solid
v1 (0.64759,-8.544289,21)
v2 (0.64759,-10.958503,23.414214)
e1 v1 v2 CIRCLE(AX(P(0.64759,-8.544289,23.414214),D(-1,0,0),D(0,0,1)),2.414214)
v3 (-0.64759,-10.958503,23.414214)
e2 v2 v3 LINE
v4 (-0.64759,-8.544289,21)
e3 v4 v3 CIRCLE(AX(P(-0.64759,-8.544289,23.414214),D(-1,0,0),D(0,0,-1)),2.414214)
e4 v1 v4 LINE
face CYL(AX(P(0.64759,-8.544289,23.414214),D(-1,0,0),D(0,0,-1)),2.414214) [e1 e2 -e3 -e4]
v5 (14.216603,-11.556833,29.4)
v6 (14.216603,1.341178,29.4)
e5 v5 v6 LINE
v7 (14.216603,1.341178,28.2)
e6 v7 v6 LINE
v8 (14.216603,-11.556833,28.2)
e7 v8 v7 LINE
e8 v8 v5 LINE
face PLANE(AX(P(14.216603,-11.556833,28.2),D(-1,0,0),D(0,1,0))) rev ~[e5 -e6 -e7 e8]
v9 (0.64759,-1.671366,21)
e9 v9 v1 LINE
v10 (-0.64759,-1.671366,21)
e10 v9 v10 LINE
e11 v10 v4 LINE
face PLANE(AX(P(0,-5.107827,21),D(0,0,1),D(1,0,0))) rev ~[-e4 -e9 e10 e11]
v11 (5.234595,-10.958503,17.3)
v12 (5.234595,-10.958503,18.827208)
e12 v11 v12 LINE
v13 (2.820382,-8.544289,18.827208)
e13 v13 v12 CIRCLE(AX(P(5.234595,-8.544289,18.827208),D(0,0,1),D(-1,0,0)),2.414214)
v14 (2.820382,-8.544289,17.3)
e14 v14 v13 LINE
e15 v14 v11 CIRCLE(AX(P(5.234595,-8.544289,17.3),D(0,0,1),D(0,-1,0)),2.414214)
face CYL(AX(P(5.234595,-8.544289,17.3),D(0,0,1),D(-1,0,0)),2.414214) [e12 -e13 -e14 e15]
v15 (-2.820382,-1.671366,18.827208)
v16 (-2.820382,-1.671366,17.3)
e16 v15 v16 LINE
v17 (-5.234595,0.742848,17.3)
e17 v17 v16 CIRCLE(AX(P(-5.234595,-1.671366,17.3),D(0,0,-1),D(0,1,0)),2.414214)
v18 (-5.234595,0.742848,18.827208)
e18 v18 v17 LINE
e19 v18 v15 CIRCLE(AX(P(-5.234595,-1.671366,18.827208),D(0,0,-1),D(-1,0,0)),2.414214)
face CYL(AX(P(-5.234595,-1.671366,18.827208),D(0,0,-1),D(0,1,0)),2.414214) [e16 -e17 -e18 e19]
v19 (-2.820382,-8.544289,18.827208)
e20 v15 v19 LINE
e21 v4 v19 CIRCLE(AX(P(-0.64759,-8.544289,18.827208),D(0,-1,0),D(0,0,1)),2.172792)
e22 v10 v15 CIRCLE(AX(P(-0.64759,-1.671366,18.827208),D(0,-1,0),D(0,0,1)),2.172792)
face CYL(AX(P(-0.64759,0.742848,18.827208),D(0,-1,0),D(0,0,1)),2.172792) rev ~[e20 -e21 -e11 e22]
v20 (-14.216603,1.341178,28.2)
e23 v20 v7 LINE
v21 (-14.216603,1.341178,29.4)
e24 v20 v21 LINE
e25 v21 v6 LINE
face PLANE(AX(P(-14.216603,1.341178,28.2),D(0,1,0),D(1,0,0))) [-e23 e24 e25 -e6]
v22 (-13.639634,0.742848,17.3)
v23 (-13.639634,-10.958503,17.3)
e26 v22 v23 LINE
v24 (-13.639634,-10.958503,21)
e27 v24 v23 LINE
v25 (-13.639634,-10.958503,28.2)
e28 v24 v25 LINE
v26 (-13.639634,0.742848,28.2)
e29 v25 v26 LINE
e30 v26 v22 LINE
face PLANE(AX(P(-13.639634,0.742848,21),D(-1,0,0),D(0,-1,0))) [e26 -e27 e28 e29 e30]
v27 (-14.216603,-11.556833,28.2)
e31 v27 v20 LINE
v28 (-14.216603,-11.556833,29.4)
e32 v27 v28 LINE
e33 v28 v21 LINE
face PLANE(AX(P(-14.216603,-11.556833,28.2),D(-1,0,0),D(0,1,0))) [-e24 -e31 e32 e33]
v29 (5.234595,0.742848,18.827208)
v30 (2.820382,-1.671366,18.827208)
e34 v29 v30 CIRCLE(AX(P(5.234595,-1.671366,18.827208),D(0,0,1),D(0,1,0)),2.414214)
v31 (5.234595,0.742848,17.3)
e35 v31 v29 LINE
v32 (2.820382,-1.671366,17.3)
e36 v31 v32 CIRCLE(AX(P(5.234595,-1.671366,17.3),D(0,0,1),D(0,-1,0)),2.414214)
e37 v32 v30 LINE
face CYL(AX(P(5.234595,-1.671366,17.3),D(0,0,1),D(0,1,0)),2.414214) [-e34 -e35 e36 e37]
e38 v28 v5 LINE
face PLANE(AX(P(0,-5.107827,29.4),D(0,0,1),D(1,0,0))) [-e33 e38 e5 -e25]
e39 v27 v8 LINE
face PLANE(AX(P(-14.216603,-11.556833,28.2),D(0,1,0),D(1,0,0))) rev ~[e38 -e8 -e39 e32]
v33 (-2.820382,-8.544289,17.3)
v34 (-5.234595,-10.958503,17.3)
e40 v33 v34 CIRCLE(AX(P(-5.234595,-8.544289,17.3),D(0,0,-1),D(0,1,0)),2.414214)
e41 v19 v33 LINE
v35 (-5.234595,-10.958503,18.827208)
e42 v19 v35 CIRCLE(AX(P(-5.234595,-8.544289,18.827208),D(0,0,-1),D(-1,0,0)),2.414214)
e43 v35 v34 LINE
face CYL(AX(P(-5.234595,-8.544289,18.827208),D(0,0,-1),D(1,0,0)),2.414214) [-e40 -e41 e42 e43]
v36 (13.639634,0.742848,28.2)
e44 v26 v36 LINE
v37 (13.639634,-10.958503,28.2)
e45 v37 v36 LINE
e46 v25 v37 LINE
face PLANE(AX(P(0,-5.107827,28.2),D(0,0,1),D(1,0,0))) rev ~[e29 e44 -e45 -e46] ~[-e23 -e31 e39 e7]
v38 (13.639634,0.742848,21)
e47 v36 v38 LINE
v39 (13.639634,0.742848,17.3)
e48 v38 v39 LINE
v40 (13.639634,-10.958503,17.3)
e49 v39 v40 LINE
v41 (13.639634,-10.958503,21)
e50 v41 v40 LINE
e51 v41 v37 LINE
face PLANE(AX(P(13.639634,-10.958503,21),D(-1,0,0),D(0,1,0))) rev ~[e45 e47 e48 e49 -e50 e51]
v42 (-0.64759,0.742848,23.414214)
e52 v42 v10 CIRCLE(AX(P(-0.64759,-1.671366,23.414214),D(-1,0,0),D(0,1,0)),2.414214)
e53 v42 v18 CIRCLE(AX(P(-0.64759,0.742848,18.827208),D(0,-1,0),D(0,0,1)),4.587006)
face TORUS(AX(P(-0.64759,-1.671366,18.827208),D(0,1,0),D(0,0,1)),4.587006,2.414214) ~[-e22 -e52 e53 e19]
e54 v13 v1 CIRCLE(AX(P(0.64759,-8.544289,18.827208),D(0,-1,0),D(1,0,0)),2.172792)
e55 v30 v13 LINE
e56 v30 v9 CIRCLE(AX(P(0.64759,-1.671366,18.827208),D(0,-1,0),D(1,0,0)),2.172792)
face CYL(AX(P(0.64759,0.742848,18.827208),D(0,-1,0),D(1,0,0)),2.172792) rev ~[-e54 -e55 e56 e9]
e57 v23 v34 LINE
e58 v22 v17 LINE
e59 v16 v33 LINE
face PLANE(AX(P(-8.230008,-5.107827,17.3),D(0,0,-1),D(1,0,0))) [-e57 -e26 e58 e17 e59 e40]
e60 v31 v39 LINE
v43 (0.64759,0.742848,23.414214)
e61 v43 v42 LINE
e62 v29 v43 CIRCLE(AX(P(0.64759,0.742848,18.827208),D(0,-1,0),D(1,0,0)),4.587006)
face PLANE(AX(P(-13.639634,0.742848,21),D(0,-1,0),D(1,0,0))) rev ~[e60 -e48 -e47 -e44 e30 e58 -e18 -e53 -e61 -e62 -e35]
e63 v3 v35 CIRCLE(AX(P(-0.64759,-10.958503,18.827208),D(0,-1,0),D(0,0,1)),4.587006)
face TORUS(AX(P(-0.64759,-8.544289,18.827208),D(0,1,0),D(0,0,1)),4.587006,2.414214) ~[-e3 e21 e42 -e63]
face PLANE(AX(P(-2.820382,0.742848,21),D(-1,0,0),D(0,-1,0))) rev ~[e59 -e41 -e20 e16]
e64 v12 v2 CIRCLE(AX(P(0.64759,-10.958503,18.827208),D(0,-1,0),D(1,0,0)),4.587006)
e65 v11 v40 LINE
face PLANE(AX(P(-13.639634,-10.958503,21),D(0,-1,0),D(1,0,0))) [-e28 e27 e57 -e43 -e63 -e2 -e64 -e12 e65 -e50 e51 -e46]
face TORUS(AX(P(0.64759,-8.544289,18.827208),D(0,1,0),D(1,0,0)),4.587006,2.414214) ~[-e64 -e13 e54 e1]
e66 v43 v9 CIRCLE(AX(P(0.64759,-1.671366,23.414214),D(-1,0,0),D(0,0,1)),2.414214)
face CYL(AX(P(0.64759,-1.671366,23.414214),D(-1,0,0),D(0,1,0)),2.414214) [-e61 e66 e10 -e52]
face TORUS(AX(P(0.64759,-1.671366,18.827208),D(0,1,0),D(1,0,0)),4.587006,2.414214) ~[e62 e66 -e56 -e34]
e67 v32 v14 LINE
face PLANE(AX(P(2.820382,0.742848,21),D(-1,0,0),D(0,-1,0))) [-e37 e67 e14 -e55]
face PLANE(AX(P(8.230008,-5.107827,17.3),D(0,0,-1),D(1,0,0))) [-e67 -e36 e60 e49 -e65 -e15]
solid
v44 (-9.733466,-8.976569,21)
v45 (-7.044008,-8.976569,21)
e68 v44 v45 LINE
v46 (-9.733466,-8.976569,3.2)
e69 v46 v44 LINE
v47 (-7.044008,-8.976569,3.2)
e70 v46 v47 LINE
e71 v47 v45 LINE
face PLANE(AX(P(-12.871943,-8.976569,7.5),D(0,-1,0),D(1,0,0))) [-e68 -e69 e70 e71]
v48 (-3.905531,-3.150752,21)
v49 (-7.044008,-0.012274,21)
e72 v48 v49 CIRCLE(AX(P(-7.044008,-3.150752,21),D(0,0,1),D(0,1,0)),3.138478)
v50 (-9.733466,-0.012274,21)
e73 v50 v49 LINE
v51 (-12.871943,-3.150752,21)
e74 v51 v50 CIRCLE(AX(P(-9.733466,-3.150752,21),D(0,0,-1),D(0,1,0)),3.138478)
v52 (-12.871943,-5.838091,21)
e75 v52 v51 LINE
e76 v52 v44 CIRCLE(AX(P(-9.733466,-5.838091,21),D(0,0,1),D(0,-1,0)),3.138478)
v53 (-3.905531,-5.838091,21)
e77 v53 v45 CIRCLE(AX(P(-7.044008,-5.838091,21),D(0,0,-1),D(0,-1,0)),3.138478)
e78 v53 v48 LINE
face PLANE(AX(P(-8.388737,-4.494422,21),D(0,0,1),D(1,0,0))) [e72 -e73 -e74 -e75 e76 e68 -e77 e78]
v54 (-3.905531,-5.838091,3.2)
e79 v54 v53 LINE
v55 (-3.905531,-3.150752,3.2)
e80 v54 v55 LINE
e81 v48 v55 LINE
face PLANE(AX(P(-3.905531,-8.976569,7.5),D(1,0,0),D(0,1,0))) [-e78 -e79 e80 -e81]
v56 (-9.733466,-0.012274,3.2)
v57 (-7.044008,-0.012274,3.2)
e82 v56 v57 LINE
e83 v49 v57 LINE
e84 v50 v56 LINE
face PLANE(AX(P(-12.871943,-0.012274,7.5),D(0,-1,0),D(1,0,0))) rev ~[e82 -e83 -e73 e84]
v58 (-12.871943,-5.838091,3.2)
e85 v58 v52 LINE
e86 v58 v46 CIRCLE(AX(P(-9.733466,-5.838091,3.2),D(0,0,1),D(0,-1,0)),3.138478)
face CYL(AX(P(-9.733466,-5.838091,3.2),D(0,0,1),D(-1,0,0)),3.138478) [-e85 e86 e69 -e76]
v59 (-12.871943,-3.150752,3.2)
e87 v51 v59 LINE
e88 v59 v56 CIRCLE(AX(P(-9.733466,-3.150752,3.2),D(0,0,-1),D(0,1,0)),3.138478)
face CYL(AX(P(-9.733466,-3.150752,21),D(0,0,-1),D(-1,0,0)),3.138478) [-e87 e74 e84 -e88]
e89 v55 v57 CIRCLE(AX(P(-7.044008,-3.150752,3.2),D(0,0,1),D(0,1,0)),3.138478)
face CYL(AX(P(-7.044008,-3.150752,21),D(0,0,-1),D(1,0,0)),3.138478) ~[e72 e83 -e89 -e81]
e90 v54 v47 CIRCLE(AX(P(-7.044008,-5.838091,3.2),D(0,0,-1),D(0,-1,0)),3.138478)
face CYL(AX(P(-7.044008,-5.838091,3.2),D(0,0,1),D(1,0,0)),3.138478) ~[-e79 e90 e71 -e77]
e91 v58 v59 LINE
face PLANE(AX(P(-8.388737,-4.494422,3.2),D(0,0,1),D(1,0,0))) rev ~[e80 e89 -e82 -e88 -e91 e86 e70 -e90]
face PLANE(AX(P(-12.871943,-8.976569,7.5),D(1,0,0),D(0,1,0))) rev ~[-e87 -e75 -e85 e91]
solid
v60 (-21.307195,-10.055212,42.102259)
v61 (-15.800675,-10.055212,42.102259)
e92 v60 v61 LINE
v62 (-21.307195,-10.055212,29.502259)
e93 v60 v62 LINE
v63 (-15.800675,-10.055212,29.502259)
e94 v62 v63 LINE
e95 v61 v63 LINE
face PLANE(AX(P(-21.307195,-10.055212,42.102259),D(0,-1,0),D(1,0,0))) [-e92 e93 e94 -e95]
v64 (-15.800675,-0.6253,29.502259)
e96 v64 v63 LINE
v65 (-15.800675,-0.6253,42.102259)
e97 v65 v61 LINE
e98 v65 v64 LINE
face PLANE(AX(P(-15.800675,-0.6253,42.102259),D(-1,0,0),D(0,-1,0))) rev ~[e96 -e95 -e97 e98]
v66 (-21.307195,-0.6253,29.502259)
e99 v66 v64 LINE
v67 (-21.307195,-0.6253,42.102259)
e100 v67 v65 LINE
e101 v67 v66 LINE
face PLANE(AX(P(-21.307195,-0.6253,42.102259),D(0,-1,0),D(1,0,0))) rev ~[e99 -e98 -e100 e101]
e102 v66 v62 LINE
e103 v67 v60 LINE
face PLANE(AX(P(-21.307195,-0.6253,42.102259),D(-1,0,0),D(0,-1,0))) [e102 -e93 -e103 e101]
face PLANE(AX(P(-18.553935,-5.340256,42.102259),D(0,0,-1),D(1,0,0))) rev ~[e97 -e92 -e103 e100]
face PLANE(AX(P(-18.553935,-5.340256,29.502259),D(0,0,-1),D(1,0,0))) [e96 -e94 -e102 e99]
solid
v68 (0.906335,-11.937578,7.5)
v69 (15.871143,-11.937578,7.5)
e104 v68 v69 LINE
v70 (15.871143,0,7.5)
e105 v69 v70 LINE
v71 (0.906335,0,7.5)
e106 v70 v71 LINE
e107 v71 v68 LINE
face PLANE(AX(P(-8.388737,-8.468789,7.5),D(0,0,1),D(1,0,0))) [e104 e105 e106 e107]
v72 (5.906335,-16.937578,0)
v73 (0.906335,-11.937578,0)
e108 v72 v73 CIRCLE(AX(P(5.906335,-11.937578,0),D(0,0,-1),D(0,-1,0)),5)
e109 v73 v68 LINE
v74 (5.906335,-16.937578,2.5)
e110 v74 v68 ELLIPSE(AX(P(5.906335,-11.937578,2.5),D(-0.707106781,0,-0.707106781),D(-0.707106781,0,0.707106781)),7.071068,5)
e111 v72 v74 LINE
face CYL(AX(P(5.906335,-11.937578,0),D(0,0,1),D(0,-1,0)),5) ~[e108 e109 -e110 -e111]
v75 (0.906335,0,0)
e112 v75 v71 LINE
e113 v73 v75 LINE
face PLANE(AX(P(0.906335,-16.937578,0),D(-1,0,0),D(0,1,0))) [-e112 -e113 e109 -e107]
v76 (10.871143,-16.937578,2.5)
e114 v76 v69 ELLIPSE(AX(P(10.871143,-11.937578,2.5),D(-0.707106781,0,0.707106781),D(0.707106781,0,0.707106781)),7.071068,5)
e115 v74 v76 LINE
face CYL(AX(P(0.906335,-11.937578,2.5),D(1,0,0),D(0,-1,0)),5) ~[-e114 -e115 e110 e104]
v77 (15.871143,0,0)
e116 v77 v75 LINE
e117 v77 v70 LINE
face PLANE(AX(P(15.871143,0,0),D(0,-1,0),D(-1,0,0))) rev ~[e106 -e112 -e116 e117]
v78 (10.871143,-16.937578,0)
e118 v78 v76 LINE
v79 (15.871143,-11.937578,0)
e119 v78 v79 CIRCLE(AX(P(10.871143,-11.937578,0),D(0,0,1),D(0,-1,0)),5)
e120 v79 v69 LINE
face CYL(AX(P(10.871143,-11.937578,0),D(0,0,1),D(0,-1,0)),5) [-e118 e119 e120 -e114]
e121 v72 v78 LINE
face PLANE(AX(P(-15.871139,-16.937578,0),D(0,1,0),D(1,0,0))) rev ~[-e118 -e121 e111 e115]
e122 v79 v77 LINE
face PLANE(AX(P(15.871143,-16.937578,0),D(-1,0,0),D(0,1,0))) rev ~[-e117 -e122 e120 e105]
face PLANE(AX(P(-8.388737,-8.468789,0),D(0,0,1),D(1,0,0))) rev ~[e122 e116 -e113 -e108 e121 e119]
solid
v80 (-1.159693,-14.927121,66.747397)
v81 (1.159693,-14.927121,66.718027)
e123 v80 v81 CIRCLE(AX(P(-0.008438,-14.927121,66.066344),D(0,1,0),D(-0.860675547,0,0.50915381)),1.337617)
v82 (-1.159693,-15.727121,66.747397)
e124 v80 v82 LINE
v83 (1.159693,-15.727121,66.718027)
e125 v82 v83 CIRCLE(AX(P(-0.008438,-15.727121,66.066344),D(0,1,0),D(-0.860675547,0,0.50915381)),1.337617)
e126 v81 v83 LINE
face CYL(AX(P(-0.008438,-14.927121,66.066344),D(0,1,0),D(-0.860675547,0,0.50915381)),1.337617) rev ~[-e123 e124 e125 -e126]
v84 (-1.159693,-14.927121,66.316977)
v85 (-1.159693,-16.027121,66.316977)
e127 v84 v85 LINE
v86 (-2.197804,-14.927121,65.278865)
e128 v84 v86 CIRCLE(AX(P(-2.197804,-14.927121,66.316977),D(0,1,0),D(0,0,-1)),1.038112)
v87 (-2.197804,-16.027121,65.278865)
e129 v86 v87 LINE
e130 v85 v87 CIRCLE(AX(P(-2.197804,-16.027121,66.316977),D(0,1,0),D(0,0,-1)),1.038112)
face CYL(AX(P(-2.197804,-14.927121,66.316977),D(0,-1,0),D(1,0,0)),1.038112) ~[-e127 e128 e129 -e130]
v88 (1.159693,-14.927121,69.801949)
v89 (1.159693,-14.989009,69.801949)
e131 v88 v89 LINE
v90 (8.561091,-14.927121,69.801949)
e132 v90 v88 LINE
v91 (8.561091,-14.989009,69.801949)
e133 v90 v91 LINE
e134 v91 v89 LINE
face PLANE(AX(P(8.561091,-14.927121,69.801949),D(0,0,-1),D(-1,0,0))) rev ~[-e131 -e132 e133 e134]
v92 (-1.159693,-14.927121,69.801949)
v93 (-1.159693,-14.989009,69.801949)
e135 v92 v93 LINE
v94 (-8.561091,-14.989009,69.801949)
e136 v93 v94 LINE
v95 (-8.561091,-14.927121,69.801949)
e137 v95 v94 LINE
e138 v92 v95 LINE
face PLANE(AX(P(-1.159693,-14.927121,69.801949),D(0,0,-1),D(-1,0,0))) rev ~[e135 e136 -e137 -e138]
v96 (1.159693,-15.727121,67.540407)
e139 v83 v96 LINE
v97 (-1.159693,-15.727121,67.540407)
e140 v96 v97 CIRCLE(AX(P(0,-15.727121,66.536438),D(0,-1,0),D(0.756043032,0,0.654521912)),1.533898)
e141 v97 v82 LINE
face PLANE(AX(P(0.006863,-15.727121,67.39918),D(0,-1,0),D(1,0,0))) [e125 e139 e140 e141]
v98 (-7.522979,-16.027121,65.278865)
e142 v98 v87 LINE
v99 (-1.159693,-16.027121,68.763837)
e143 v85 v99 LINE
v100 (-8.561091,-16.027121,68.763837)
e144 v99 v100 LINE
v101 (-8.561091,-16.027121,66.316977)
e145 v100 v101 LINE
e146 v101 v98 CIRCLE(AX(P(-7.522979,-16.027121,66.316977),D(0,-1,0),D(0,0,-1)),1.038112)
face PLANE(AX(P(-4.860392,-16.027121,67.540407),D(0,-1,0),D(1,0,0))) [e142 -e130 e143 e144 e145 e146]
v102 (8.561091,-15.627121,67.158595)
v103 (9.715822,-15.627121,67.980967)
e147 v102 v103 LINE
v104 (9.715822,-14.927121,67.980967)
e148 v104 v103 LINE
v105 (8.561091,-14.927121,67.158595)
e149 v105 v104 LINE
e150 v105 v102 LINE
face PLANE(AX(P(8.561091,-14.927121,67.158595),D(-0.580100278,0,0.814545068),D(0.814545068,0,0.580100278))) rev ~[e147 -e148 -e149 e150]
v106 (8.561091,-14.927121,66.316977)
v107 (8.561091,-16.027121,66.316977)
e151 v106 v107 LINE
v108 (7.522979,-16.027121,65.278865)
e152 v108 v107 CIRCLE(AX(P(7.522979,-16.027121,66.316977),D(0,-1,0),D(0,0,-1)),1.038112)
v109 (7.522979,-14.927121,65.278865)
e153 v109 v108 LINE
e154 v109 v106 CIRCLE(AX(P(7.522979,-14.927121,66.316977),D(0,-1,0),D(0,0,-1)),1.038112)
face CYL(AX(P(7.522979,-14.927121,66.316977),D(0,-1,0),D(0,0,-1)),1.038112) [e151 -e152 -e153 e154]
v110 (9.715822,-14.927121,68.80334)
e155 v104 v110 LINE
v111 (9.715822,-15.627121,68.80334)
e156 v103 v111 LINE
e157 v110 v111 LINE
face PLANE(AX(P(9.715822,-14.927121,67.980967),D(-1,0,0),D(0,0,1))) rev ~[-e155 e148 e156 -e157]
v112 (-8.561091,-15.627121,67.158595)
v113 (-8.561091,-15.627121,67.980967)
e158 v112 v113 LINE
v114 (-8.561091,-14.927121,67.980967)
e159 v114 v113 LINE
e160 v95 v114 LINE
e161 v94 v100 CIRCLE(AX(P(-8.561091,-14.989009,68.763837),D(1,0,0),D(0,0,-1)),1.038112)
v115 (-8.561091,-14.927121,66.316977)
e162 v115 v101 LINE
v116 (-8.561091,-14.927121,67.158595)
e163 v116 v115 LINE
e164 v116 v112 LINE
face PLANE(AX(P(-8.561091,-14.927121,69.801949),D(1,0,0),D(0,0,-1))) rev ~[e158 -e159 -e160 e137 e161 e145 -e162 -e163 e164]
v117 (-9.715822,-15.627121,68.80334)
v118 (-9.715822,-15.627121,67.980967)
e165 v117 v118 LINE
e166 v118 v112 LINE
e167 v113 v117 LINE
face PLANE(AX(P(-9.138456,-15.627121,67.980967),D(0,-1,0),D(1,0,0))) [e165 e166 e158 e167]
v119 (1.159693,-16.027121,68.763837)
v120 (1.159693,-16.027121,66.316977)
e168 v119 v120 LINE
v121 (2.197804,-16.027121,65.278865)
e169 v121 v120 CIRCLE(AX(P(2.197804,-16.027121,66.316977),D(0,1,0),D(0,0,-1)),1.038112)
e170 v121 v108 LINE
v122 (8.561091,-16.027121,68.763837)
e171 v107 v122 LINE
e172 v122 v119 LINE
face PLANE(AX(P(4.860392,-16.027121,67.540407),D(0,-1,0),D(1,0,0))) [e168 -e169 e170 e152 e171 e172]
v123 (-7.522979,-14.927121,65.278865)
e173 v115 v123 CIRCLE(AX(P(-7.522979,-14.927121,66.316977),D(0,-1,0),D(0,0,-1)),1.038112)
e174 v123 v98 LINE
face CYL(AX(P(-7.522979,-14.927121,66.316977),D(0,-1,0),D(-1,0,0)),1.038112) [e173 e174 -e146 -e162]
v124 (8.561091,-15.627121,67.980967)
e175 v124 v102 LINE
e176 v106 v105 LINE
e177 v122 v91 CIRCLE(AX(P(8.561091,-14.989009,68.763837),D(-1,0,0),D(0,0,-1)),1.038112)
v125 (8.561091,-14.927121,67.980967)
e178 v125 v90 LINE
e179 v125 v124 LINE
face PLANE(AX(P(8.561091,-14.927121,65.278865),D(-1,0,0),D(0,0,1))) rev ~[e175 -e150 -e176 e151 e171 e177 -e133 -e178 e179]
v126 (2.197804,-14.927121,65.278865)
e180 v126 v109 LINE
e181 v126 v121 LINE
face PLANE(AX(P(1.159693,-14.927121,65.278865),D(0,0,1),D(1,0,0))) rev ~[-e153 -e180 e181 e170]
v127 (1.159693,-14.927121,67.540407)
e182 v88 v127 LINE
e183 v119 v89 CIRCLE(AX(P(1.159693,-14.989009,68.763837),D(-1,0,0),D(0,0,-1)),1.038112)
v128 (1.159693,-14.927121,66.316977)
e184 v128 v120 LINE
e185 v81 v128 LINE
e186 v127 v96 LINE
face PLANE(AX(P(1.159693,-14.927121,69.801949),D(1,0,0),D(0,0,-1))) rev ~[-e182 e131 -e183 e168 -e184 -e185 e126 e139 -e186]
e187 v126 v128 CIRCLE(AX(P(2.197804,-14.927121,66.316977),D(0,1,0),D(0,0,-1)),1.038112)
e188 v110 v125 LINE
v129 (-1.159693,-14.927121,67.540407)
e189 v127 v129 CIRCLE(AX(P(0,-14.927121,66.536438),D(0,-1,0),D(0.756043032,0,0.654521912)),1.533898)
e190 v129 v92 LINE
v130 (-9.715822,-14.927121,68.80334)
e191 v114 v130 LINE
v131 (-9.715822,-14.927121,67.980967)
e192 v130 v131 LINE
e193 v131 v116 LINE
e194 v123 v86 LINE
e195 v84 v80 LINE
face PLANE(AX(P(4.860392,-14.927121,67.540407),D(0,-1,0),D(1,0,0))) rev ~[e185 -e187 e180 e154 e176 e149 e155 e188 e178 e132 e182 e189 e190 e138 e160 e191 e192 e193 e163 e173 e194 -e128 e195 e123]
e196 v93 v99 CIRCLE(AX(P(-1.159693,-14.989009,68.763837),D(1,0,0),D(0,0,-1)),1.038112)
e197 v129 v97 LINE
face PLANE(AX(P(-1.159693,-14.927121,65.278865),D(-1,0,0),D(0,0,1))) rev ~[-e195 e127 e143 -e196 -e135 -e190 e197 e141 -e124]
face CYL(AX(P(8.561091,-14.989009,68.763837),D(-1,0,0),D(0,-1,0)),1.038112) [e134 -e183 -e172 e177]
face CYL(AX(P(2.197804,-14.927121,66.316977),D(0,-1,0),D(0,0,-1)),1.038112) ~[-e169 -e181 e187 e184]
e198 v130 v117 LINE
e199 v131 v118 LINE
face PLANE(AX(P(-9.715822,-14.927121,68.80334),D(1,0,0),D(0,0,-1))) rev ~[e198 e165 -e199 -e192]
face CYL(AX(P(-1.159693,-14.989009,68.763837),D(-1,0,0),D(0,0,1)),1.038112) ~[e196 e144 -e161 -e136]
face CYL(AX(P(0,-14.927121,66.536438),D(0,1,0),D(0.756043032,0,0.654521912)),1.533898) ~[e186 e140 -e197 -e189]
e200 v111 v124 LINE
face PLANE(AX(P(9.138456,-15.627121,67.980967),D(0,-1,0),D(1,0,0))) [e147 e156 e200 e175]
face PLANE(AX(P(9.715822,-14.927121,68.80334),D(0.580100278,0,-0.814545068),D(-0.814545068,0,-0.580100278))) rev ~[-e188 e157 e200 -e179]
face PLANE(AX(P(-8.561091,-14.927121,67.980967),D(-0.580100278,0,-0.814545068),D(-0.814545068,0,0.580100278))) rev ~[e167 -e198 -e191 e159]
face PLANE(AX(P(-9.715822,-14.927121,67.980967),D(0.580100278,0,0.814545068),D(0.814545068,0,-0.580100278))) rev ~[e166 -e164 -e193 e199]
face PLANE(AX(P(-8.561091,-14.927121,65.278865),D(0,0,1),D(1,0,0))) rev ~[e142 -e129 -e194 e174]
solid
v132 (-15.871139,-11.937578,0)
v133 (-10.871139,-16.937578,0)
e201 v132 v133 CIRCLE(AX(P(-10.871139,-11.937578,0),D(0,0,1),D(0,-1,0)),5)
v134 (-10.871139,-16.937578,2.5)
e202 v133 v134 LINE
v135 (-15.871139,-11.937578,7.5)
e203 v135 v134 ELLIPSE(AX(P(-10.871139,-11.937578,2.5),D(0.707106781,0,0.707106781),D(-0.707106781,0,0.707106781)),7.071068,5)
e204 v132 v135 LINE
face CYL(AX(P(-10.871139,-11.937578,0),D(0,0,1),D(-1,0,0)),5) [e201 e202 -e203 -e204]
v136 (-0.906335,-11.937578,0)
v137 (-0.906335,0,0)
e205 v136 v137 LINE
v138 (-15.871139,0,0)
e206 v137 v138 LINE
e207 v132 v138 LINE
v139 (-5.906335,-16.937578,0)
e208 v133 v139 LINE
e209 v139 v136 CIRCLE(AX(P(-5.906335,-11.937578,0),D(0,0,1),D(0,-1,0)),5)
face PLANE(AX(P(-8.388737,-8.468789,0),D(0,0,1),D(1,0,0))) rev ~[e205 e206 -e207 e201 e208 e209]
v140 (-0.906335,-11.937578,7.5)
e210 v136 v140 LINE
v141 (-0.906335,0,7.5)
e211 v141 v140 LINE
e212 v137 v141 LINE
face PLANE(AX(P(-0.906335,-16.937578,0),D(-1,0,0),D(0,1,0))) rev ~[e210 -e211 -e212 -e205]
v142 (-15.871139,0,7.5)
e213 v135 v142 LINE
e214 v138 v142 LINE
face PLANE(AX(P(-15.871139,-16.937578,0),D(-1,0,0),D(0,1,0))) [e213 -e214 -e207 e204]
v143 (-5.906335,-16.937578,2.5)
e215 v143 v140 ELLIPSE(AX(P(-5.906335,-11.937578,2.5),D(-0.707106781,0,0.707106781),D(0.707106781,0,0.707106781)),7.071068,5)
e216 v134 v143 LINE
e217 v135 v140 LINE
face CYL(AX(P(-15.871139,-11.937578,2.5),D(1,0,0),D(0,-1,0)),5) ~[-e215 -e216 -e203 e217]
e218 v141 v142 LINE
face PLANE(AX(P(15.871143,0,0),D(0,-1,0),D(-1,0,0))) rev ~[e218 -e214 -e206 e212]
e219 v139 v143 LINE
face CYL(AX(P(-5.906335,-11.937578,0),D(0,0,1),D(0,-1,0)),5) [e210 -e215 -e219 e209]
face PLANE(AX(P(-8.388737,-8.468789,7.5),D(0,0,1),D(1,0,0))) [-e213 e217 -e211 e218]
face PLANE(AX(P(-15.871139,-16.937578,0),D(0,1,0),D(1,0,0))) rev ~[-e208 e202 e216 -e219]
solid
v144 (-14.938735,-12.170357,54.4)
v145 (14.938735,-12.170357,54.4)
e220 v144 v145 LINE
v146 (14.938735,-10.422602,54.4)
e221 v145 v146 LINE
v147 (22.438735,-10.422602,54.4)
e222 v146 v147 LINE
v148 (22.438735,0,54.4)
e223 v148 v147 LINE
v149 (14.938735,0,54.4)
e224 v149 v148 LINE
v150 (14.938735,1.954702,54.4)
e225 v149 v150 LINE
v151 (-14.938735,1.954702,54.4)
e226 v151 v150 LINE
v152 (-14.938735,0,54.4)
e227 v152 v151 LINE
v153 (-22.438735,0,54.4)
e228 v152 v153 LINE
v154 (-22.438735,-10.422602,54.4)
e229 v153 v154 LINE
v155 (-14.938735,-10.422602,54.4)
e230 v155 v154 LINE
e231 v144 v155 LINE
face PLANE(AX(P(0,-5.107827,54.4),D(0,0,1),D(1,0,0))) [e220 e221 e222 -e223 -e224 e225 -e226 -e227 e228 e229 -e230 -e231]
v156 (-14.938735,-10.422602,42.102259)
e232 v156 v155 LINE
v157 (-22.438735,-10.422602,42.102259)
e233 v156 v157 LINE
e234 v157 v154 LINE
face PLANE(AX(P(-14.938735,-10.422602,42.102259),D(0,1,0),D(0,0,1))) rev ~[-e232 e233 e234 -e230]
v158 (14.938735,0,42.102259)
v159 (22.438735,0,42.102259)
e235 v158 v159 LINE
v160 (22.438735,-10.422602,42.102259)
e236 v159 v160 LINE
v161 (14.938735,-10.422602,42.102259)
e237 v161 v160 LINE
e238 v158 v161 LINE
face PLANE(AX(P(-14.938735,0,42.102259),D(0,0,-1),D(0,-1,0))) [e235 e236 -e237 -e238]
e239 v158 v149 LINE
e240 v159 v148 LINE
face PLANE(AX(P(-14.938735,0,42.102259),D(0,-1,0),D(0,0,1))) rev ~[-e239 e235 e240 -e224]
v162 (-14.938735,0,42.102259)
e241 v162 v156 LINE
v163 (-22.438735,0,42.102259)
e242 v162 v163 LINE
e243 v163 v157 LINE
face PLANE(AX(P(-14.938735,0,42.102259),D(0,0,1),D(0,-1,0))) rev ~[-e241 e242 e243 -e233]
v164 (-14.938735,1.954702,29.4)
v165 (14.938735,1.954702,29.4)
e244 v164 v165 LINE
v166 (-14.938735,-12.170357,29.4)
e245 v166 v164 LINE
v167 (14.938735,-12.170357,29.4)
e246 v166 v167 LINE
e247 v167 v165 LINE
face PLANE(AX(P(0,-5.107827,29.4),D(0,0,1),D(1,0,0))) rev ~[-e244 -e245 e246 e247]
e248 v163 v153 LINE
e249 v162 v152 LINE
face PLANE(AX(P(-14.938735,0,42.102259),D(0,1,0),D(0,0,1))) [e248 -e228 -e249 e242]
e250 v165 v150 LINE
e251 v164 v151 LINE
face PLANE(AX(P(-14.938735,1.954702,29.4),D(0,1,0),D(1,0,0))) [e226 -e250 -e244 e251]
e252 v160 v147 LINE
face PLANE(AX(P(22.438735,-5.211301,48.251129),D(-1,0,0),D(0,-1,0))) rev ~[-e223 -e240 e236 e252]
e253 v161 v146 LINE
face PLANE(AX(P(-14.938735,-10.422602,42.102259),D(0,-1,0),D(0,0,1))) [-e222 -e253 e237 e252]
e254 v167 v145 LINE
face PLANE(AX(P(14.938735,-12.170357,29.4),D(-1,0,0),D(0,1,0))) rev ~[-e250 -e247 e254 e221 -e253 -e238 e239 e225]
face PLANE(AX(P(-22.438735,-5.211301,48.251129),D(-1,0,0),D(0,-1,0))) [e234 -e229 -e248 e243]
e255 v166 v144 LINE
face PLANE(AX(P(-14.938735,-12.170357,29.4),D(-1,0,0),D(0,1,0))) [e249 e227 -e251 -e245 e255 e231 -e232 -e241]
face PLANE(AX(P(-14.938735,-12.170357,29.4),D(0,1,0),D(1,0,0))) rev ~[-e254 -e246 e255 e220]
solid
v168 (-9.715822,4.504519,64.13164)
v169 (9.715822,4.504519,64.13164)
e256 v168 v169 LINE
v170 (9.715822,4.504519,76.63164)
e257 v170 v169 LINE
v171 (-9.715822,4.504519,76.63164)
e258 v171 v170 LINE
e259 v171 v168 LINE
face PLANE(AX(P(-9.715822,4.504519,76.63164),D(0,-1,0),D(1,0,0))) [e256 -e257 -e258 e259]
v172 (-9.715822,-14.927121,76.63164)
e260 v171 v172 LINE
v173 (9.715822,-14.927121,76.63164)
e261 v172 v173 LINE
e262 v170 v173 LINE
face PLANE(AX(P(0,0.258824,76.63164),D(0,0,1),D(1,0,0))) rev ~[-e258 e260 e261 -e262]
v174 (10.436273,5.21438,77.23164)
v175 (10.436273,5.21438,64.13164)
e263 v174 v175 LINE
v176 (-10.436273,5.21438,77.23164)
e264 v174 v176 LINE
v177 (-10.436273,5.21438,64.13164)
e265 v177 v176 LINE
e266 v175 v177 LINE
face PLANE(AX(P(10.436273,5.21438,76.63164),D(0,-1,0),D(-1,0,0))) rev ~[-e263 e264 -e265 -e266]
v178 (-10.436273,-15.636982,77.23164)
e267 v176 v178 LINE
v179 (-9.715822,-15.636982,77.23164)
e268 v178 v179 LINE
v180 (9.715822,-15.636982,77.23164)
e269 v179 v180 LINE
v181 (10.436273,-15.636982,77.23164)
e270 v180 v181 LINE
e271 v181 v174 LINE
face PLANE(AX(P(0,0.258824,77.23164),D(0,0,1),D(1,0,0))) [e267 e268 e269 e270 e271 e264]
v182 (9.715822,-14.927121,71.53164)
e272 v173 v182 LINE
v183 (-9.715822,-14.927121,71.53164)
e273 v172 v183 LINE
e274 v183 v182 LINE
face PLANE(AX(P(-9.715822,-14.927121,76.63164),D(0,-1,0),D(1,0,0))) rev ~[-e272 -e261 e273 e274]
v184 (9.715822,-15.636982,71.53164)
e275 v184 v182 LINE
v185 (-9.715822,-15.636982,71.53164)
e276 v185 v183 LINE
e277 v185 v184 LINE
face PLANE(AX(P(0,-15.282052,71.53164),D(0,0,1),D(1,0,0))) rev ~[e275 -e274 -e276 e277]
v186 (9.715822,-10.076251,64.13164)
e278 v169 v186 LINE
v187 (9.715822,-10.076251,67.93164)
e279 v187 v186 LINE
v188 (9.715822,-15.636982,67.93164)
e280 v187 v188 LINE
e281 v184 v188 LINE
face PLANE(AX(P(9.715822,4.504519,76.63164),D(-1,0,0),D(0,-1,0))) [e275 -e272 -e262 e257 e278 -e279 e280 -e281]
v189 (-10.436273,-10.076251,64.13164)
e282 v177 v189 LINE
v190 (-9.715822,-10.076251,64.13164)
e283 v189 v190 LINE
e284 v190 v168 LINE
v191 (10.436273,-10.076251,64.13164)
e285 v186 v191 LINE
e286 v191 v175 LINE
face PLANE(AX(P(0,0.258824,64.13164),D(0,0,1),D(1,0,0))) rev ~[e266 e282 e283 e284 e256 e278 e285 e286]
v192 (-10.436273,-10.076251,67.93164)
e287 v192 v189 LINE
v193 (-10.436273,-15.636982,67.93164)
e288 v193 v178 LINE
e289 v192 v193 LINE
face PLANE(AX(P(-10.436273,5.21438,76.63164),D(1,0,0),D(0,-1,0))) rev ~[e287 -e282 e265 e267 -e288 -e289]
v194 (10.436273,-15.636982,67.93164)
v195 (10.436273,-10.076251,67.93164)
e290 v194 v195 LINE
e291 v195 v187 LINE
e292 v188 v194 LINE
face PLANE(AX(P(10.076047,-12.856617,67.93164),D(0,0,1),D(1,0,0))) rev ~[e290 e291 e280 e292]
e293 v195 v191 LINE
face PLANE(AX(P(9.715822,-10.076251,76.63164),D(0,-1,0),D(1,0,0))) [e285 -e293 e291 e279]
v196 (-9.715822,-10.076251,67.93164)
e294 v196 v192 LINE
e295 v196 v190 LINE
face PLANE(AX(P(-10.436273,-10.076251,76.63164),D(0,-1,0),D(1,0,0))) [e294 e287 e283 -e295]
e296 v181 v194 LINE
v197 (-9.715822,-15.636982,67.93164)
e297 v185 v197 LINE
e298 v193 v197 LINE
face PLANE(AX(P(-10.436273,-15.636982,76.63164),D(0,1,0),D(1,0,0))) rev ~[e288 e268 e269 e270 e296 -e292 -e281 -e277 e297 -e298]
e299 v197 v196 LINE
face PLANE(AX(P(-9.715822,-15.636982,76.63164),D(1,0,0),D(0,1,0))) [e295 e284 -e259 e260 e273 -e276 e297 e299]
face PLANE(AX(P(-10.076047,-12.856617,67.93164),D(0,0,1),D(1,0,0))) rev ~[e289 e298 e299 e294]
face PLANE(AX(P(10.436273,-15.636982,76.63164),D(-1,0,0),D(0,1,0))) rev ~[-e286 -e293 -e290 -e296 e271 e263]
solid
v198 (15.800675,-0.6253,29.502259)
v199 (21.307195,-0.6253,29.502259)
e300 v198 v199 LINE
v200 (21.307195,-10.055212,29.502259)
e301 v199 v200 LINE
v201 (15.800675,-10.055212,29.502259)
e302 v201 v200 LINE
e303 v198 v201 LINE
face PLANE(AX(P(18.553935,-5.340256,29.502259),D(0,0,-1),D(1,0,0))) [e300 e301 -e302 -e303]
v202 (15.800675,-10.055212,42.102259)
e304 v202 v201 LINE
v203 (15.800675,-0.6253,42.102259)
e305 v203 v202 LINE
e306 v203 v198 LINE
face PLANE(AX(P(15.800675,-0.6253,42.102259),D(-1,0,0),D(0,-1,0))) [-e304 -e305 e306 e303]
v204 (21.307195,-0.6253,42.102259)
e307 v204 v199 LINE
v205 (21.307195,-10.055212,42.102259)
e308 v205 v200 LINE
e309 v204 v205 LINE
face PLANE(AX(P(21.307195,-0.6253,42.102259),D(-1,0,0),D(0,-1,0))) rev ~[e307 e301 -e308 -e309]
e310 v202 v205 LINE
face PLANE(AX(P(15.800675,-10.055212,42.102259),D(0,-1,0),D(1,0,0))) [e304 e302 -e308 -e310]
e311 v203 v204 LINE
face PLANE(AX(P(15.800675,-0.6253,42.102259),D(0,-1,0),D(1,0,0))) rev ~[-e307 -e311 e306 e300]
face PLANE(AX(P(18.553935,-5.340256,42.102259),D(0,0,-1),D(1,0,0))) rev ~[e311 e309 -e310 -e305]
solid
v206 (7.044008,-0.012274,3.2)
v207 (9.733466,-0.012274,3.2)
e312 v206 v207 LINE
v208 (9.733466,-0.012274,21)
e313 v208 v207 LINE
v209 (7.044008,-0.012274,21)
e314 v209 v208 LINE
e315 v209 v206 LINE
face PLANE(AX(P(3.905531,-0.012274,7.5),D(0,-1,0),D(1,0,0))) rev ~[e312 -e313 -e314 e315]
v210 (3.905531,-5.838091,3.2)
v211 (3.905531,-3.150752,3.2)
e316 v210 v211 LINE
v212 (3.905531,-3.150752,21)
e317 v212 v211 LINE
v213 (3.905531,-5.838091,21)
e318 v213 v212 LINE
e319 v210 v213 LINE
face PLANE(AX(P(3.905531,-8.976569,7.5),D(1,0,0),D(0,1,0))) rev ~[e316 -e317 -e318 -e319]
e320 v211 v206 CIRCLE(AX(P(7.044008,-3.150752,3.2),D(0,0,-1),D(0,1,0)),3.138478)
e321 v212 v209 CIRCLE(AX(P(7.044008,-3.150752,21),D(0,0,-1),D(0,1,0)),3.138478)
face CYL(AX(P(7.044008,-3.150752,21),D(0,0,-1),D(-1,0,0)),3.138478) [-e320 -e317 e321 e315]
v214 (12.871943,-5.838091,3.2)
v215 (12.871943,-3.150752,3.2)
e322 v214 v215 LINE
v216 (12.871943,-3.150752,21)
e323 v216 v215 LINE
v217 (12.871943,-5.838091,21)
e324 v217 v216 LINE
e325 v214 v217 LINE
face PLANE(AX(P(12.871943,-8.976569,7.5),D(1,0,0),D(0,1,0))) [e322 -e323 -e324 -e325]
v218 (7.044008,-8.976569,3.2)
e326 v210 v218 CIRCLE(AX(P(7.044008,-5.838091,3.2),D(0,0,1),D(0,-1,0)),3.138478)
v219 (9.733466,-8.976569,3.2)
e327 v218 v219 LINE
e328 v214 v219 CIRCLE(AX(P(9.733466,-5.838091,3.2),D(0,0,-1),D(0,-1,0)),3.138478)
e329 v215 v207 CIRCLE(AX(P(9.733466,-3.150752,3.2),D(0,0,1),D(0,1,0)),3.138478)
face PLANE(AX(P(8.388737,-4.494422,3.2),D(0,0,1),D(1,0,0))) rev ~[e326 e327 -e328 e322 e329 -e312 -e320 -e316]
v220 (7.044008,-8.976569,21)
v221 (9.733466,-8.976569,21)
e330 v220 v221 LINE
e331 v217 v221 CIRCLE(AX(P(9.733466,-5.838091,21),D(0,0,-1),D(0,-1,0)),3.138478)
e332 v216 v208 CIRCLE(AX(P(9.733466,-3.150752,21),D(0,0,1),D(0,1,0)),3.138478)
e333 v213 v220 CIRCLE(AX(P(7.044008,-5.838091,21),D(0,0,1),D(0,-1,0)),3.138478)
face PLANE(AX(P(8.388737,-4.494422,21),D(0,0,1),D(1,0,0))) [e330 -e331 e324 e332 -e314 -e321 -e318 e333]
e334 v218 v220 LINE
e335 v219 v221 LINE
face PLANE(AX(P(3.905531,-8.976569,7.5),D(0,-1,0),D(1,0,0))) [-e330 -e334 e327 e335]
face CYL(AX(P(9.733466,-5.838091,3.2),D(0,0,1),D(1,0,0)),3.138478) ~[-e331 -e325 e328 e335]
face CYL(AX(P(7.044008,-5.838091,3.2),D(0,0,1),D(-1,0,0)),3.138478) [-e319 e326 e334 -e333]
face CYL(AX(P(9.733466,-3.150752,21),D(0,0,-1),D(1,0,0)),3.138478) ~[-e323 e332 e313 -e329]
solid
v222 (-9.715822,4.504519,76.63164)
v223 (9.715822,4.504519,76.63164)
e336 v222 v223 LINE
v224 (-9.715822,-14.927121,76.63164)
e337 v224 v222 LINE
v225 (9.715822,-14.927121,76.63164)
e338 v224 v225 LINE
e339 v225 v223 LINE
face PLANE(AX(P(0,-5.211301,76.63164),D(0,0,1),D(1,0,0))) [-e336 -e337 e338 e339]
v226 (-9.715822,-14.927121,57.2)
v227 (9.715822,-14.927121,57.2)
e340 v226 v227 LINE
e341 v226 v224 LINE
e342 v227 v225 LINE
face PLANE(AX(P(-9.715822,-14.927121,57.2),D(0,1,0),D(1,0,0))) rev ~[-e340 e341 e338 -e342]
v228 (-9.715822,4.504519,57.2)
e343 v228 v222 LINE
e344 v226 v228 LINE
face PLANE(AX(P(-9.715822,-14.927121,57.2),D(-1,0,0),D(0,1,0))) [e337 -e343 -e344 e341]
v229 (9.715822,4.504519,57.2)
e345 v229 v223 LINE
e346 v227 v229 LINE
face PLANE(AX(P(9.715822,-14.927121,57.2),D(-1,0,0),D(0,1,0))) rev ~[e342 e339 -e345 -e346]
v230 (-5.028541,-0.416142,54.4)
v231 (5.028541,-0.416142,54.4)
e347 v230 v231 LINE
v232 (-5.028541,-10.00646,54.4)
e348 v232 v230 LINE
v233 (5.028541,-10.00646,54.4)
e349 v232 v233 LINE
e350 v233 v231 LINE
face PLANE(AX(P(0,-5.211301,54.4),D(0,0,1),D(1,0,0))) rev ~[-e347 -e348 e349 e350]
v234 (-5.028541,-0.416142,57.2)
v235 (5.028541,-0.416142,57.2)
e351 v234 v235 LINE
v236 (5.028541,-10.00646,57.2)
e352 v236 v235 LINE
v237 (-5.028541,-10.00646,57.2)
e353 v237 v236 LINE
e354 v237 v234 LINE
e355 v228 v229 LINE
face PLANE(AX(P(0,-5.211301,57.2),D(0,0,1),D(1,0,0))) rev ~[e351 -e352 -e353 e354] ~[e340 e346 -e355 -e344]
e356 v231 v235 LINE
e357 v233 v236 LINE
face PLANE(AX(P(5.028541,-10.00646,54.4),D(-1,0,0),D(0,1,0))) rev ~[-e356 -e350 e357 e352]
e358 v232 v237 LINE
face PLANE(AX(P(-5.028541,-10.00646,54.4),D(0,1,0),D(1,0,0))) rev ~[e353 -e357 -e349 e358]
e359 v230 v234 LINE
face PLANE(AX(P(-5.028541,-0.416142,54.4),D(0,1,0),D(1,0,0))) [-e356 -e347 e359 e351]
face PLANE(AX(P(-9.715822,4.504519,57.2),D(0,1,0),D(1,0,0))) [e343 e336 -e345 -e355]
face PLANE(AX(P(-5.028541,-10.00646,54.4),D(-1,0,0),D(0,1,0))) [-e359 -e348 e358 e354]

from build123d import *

# Parameters (mm, degrees)
F0_W           = 14.9648044608
F0_H           = 16.937578097
F0_W_2         = 1.812669565
F0_W_3         = 14.9648083382
F1_DEPTH       = 7.5
F2_DEPTH       = 14.2
F3_R           = 5
F4_W           = 8.966412507
F4_H           = 8.9642944624
F5_DEPTH       = 13.5
F5_DEPTH_BACK  = 4.3
F6_R           = 3.1384776311
F6_2_R         = 3.1384776311
F7_W           = 27.2792670876
F7_H           = 11.7013510317
F8_DEPTH       = 7.2
F9_W           = 10.8192516491
F9_H           = 11.7013510317
F10_DEPTH      = 3.7
F10_DEPTH_BACK = 2.3
F11_R          = 2.1727922061
F12_R          = 2.4142135624
F13_W          = 28.4332055598
F13_H          = 12.8980111331
F14_DEPTH      = 1.2
F15_W          = 29.8774708062
F15_H          = 14.1250584275
F15_W_2        = 28.4332055598
F15_H_2        = 12.8980111331
F16_DEPTH      = 25
F17_W          = 10.4226022959
F17_H          = 12.2977413476
F18_DEPTH      = 7.5
F18_DEPTH_BACK = 37.37747
F19_W          = 5.5065192282
F19_H          = 9.4299116172
F20_DEPTH      = 12.6
F21_W          = 10.0570814684
F21_H          = 9.5903184265
F22_DEPTH      = 2.8
F23_W          = 19.431643188
F23_H          = 19.43164
F23_W_2        = 10.0570814684
F23_H_2        = 9.5903184265
F24_DEPTH      = 19.43164
F26_DEPTH      = 12.5
F27_DEPTH      = 8.7
F25_W          = 19.431643188
F25_H          = 0.7098612483
F28_DEPTH      = 5.1
F29_DEPTH      = 0.6
F31_DEPTH      = 0.8
F32_DEPTH      = 1.1
F33_DEPTH      = 0.7
F34_R          = 1.0381118318


with BuildPart() as f1:
    # F0 (on Top) → F1 (new body)
    with BuildSketch(Plane.XY):
        with Locations((-8.3887370129, -8.4687890485)):
            Rectangle(F0_W, F0_H)
        with Locations((0, -8.4687890485)):
            Rectangle(F0_W_2, F0_H)
        with Locations((8.3887389516, -8.4687890485)):
            Rectangle(F0_W_3, F0_H)
    extrude(amount=F1_DEPTH)

    # F0 (on Top) → F2 (cut)
    with BuildSketch(Plane.XY):
        with Locations((0, -8.4687890485)):
            Rectangle(F0_W_2, F0_H)
    extrude(amount=F2_DEPTH, mode=Mode.SUBTRACT)

    # F3
    f3_edges = [f1.edges().sort_by_distance(p)[0] for p in [
        (-15.871139, -16.937578, 3.75),
        (-0.906335, -16.937578, 3.75),
        (0.906335, -16.937578, 3.75),
        (15.871143, -16.937578, 3.75),
        (-8.388737, -16.937578, 7.5),
        (8.388739, -16.937578, 7.5),
    ]]
    fillet(f3_edges, radius=F3_R)


with BuildPart() as f5:
    # F4 (on face) → F5 (new body, two sides)
    with BuildSketch(Plane.XY.offset(7.5)) as f5_sk:
        with Locations((-8.3887370129, -4.4944216307)):
            Rectangle(F4_W, F4_H)
    extrude(amount=F5_DEPTH)
    extrude(f5_sk.sketch, amount=-F5_DEPTH_BACK)

    # F6
    f6_edges = [f5.edges().sort_by_distance(p)[0] for p in [
        (-12.871943, -8.976569, 12.1),
        (-3.905531, -8.976569, 12.1),
        (-12.871943, -0.012274, 12.1),
        (-3.905531, -0.012274, 12.1),
    ]]
    fillet(f6_edges, radius=F6_R)


with BuildPart() as f5b:
    # F4 (on face) → F5, piece 2 (new body, two sides)
    with BuildSketch(Plane.XY.offset(7.5)) as f5_2_sk:
        with Locations((8.3887370129, -4.4944216307)):
            Rectangle(F4_W, F4_H)
    extrude(amount=F5_DEPTH)
    extrude(f5_2_sk.sketch, amount=-F5_DEPTH_BACK)

    # F6#2
    f6_2_edges = [f5b.edges().sort_by_distance(p)[0] for p in [
        (3.905531, -8.976569, 12.1),
        (12.871943, -8.976569, 12.1),
        (12.871943, -0.012274, 12.1),
        (3.905531, -0.012274, 12.1),
    ]]
    fillet(f6_2_edges, radius=F6_2_R)


with BuildPart() as f8:
    # F7 (on face) → F8 (new body)
    with BuildSketch(Plane.XY.offset(21)):
        with Locations((0, -5.1078274846)):
            Rectangle(F7_W, F7_H)
    extrude(amount=F8_DEPTH)

    # F9 (on face) → F10 (join, two sides)
    with BuildSketch(Plane(origin=(0, 0, 21), x_dir=(1, 0, 0), z_dir=(0, 0, -1))) as f10_sk:
        with Locations((-8.2300077192, 5.1078274846)):
            Rectangle(F9_W, F9_H)
        with Locations((8.2300077192, 5.1078274846)):
            Rectangle(F9_W, F9_H)
    extrude(amount=F10_DEPTH)
    extrude(f10_sk.sketch, amount=-F10_DEPTH_BACK)

    # F11
    f11_edges = [f8.edges().sort_by_distance(p)[0] for p in [
        (2.820382, -5.107827, 21),
        (-2.820382, -5.107827, 21),
    ]]
    fillet(f11_edges, radius=F11_R)

    # F12
    f12_edges = [f8.edges().sort_by_distance(p)[0] for p in [
        (2.183986, 0.742848, 20.363604),
        (-2.183986, -10.958503, 20.363604),
        (2.820382, -10.958503, 18.063604),
        (2.183986, -10.958503, 20.363604),
        (0, -10.958503, 21),
        (-2.820382, -10.958503, 18.063604),
        (2.820382, 0.742848, 18.063604),
        (0, 0.742848, 21),
        (-2.183986, 0.742848, 20.363604),
        (-2.820382, 0.742848, 18.063604),
    ]]
    fillet(f12_edges, radius=F12_R)

    # F13 (on face) → F14 (join)
    with BuildSketch(Plane.XY.offset(28.2)):
        with Locations((0, -5.1078274846)):
            Rectangle(F13_W, F13_H)
    extrude(amount=F14_DEPTH)


with BuildPart() as f16:
    # F15 (on face) → F16 (new body)
    with BuildSketch(Plane.XY.offset(29.4)):
        with Locations((0, -5.1078274846)):
            Rectangle(F15_W, F15_H)
        with Locations((0, -5.1078274846)):
            Rectangle(F15_W_2, F15_H_2, mode=Mode.SUBTRACT)
        with Locations((0, -5.1078274846)):
            Rectangle(F15_W_2, F15_H_2)
    extrude(amount=F16_DEPTH)

    # F17 (on face) → F18 (join, two sides)
    with BuildSketch(Plane(origin=(-14.9387354031, 0, 0), x_dir=(0, -1, 0), z_dir=(-1, 0, 0))) as f18_sk:
        with Locations((5.2113011479, 48.2511293262)):
            Rectangle(F17_W, F17_H)
    extrude(amount=F18_DEPTH)
    extrude(f18_sk.sketch, amount=-F18_DEPTH_BACK)


with BuildPart() as f20:
    # F19 (on face) → F20 (new body)
    with BuildSketch(Plane(origin=(0, 0, 42.1022586524), x_dir=(1, 0, 0), z_dir=(0, 0, -1))):
        with Locations((-18.5539349914, 5.3402557969)):
            Rectangle(F19_W, F19_H)
    extrude(amount=F20_DEPTH)


with BuildPart() as f20b:
    # F19 (on face) → F20, piece 2 (new body)
    with BuildSketch(Plane(origin=(0, 0, 42.1022586524), x_dir=(1, 0, 0), z_dir=(0, 0, -1))):
        with Locations((18.5539349914, 5.3402557969)):
            Rectangle(F19_W, F19_H)
    extrude(amount=F20_DEPTH)


with BuildPart() as f22:
    # F21 (on face) → F22 (new body)
    with BuildSketch(Plane.XY.offset(54.4)):
        with Locations((0, -5.2113011479)):
            Rectangle(F21_W, F21_H)
    extrude(amount=F22_DEPTH)

    # F23 (on face) → F24 (join)
    with BuildSketch(Plane.XY.offset(57.2)):
        with Locations((0, -5.2113011479)):
            Rectangle(F23_W, F23_H)
        with Locations((0, -5.2113011479)):
            Rectangle(F23_W_2, F23_H_2, mode=Mode.SUBTRACT)
        with Locations((0, -5.2113011479)):
            Rectangle(F23_W_2, F23_H_2)
    extrude(amount=F24_DEPTH)


with BuildPart() as f26:
    # F25 (on face) → F26 (new body)
    with BuildSketch(Plane.XY.offset(76.63164)):
        Polygon((9.715821594, -10.076250881), (10.4362731799, -10.076250881), (10.4362731799, 5.2143801004), (-10.4362731799, 5.2143801004), (-10.4362731799, -10.076250881), (-9.715821594, -10.076250881), (-9.715821594, 4.5045188521), (9.715821594, 4.5045188521), align=None)
    extrude(amount=-F26_DEPTH)

    # F25 (on face) → F27 (join)
    with BuildSketch(Plane.XY.offset(76.63164)):
        Polygon((-10.4362731799, -15.6369823962), (-9.715821594, -15.6369823962), (-9.715821594, -14.9271211479), (-9.715821594, -10.076250881), (-10.4362731799, -10.076250881), align=None)
        Polygon((9.715821594, -15.6369823962), (10.4362731799, -15.6369823962), (10.4362731799, -10.076250881), (9.715821594, -10.076250881), (9.715821594, -14.9271211479), align=None)
    extrude(amount=-F27_DEPTH)

    # F25 (on face) → F28 (join)
    with BuildSketch(Plane.XY.offset(76.63164)):
        with Locations((0, -15.2820517721)):
            Rectangle(F25_W, F25_H)
    extrude(amount=-F28_DEPTH)

    # F25 (on face) → F29 (join)
    with BuildSketch(Plane.XY.offset(76.63164)):
        Polygon((9.715821594, -10.076250881), (10.4362731799, -10.076250881), (10.4362731799, 5.2143801004), (-10.4362731799, 5.2143801004), (-10.4362731799, -10.076250881), (-9.715821594, -10.076250881), (-9.715821594, 4.5045188521), (9.715821594, 4.5045188521), align=None)
        Polygon((-10.4362731799, -15.6369823962), (-9.715821594, -15.6369823962), (-9.715821594, -14.9271211479), (-9.715821594, -10.076250881), (-10.4362731799, -10.076250881), align=None)
        with Locations((0, -15.2820517721)):
            Rectangle(F25_W, F25_H)
        Polygon((-9.715821594, -14.9271211479), (9.715821594, -14.9271211479), (9.715821594, -10.076250881), (9.715821594, 4.5045188521), (-9.715821594, 4.5045188521), (-9.715821594, -10.076250881), align=None)
        Polygon((9.715821594, -15.6369823962), (10.4362731799, -15.6369823962), (10.4362731799, -10.076250881), (9.715821594, -10.076250881), (9.715821594, -14.9271211479), align=None)
    extrude(amount=F29_DEPTH)


with BuildPart() as f31:
    # F30 (on face) → F31 (new body)
    with BuildSketch(Plane.XZ.offset(14.9271211479)):
        with BuildLine():
            Line((-1.1596926488, 67.5404071808), (-1.1596926488, 66.7473971844))
            ThreePointArc((-1.1596926488, 66.7473971844), (0.0084986196, 67.4038543011), (1.1596926488, 66.7180269957))
            Line((1.1596926488, 66.7180269957), (1.1596926488, 67.5404071808))
            ThreePointArc((1.1596926488, 67.5404071808), (0, 68.070335216), (-1.1596926488, 67.5404071808))
        make_face()
    extrude(amount=F31_DEPTH)

    # F30 (on face) → F32 (join)
    with BuildSketch(Plane.XZ.offset(14.9271211479)):
        Polygon((1.1596926488, 67.5404071808), (1.1596926488, 66.7180269957), (1.1596926488, 65.278865397), (8.561090799, 65.278865397), (8.561090799, 67.1585947275), (8.561090799, 67.9809674621), (8.561090799, 69.8019489646), (1.1596926488, 69.8019489646), align=None)
        Polygon((-8.561090799, 65.278865397), (-1.1596926488, 65.278865397), (-1.1596926488, 66.7473971844), (-1.1596926488, 67.5404071808), (-1.1596926488, 69.8019489646), (-8.561090799, 69.8019489646), (-8.561090799, 67.9809674621), (-8.561090799, 67.1585947275), align=None)
    extrude(amount=F32_DEPTH)

    # F30 (on face) → F33 (join)
    with BuildSketch(Plane.XZ.offset(14.9271211479)):
        Polygon((-9.715821594, 67.9809674621), (-8.561090799, 67.1585947275), (-8.561090799, 67.9809674621), (-9.715821594, 68.8033401966), align=None)
        Polygon((8.561090799, 67.9809674621), (8.561090799, 67.1585947275), (9.715821594, 67.9809674621), (9.715821594, 68.8033401966), align=None)
    extrude(amount=F33_DEPTH)

    # F34
    f34_edges = [f31.edges().sort_by_distance(p)[0] for p in [
        (-1.159693, -15.477121, 65.278865),
        (-8.561091, -15.477121, 65.278865),
        (1.159693, -15.477121, 65.278865),
        (8.561091, -15.477121, 65.278865),
        (-4.860392, -16.027121, 69.801949),
        (4.860392, -16.027121, 69.801949),
    ]]
    fillet(f34_edges, radius=F34_R)


solid = Compound([f1.part, f5.part, f5b.part, f8.part, f16.part, f20.part, f20b.part, f22.part, f26.part, f31.part])
